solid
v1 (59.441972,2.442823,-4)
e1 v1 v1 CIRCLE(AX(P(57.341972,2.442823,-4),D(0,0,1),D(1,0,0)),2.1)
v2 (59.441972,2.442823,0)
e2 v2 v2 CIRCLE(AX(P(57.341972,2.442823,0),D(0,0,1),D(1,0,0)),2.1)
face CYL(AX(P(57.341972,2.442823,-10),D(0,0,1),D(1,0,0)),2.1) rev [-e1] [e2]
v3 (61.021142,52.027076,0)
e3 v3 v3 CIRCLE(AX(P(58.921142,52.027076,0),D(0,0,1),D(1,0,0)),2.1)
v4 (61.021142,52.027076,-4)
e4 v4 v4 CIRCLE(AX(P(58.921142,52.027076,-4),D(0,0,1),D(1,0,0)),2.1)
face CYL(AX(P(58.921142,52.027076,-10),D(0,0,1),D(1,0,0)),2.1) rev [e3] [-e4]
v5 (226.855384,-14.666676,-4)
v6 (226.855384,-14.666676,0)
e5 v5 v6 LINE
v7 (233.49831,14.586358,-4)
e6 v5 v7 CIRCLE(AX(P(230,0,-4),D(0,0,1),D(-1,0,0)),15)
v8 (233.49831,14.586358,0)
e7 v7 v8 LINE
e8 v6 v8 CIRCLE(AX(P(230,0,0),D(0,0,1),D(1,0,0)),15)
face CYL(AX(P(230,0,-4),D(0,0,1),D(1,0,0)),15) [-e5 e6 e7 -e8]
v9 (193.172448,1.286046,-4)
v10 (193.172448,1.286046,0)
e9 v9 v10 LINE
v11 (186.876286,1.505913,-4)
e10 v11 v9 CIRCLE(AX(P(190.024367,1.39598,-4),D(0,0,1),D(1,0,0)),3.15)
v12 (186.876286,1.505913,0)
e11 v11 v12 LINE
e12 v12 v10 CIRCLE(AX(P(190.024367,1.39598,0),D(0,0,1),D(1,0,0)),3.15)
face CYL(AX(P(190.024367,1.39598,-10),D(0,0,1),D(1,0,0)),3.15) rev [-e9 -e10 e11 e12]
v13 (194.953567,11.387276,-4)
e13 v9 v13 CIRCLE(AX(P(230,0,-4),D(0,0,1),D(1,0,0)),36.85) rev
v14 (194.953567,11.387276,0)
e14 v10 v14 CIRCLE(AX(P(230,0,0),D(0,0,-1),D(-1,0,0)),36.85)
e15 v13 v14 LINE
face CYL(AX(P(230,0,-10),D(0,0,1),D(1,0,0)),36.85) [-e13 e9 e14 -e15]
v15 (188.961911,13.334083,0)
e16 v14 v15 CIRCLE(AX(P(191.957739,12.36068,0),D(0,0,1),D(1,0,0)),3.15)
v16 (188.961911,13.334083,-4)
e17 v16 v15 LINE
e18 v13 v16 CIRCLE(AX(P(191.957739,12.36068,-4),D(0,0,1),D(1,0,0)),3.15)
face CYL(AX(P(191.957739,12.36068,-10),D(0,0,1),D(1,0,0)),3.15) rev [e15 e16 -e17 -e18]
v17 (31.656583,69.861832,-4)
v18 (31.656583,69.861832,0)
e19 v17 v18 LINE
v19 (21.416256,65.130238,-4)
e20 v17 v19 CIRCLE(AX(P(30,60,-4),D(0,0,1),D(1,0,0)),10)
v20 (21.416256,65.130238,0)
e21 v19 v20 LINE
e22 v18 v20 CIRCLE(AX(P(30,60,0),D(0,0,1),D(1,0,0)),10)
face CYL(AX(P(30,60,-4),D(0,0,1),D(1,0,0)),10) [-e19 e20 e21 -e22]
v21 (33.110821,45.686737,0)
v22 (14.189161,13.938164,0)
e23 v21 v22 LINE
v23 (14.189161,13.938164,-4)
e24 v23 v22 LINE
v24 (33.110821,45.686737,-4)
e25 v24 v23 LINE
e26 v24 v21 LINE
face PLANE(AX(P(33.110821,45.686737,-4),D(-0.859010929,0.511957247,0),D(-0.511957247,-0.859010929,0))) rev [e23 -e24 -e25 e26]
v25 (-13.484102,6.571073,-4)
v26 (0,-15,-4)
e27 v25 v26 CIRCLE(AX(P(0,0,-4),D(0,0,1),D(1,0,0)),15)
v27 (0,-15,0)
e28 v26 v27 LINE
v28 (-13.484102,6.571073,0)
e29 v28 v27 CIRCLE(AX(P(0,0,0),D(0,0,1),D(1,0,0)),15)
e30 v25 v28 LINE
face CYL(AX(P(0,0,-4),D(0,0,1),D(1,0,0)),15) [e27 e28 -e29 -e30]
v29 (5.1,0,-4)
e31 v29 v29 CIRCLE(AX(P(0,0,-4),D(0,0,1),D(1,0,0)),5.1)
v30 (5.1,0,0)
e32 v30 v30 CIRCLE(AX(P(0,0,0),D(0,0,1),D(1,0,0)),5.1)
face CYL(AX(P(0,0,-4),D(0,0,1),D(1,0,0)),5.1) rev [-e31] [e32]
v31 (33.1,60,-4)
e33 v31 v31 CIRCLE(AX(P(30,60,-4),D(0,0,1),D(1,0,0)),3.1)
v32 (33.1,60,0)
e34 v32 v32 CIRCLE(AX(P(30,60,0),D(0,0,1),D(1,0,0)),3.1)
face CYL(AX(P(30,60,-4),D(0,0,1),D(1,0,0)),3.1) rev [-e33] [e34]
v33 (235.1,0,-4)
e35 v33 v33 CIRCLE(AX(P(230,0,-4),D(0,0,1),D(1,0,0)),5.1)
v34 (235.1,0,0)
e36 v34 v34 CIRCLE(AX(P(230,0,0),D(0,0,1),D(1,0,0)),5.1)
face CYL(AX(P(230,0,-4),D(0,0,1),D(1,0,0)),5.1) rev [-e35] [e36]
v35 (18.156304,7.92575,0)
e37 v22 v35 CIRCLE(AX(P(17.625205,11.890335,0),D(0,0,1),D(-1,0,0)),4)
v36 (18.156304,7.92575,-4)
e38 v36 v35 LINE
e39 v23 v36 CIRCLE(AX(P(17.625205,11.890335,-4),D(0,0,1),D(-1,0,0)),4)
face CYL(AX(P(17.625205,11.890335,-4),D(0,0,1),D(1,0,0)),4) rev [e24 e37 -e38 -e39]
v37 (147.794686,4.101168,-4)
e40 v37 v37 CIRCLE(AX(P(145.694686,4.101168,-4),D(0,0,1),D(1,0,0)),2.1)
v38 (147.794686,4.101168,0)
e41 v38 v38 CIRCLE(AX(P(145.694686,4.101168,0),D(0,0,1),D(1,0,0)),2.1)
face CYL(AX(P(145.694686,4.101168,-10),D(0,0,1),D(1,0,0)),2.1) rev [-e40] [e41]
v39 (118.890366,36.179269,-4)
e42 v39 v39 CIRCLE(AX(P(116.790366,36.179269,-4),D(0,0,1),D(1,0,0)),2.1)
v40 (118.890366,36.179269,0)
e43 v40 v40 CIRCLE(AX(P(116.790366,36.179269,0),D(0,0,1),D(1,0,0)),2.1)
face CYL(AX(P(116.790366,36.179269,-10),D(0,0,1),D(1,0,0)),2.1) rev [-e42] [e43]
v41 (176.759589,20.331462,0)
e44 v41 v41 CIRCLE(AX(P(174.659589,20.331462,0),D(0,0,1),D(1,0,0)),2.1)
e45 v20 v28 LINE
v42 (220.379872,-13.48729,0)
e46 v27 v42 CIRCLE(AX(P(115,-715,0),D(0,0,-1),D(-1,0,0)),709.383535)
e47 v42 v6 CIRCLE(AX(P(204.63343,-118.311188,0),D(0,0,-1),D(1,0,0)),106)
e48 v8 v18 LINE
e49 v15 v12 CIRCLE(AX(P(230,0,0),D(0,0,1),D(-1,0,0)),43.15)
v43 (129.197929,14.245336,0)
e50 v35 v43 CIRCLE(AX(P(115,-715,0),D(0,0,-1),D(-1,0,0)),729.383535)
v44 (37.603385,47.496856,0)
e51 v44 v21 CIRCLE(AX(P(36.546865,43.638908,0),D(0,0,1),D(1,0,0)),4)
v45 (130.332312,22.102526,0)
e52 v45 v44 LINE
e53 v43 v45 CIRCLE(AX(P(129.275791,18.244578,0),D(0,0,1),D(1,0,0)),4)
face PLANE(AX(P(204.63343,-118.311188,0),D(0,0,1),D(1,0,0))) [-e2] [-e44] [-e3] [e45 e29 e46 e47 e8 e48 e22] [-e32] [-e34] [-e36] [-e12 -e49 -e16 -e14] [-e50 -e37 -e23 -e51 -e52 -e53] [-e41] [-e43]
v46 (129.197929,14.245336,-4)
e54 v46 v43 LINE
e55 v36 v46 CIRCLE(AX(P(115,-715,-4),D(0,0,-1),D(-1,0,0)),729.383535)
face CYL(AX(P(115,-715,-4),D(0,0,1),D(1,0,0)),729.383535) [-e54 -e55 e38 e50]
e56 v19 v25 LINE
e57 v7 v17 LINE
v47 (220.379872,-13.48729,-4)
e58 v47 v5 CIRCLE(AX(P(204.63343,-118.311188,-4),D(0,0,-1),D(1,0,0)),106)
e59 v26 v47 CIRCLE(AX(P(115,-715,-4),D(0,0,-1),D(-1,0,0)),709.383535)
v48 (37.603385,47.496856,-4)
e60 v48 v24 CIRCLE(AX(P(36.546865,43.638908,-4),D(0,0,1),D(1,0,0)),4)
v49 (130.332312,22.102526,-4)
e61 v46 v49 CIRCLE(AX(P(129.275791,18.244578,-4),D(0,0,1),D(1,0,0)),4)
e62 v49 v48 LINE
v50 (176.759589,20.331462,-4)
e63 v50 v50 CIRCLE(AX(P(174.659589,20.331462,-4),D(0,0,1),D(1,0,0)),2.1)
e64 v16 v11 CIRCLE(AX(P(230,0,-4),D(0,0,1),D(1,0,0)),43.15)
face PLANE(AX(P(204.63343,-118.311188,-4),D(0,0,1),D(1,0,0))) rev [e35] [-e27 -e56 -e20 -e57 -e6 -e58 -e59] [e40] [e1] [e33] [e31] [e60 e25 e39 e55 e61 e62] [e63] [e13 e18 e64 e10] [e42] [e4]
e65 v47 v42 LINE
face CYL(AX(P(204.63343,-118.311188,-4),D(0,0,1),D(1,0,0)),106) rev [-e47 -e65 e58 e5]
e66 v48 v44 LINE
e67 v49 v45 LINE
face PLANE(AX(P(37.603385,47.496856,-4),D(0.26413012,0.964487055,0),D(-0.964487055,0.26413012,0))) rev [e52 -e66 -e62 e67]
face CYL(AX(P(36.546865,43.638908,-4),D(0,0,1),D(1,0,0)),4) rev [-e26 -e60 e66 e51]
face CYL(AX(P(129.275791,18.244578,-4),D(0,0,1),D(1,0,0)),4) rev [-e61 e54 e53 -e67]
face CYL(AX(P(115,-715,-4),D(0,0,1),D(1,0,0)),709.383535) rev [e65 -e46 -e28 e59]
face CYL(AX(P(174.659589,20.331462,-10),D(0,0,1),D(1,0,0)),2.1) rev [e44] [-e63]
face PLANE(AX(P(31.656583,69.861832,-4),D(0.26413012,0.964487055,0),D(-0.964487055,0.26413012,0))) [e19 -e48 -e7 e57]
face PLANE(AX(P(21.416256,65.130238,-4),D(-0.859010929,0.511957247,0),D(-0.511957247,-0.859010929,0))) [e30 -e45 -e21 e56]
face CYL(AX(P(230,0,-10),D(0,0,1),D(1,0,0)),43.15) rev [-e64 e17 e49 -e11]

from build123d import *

# Parameters (mm, degrees)
SKETCH_1_R             = 5.1
SKETCH_1_R_2           = 3.1
SM_BASE_FLANGE_1_DEPTH = 4
SKETCH_29_R            = 2.1
CUT_EXTRUDE_7_DEPTH    = 10
CUT_EXTRUDE_11_DEPTH   = 10


# Sheet-metal steps are written as plain solids
with BuildPart() as part:
    # Sketch 1 → Базовая кромка1 (new body)
    with BuildSketch(Plane.XY):
        with BuildLine():
            Line((21.416256147, 65.130237954), (-13.484101554, 6.571073374))
            ThreePointArc((-13.484101554, 6.571073374), (-12.719396617, -7.950908734), (0, -15))
            ThreePointArc((0, -15), (110.130832642, -5.633175847), (220.379871586, -13.487289734))
            ThreePointArc((220.379871586, -13.487289734), (223.626784147, -14.026708962), (226.855383886, -14.666676157))
            ThreePointArc((226.855383886, -14.666676157), (228.418883679, -14.916436276), (230, -15))
            ThreePointArc((230, -15), (244.896230479, -1.761339697), (233.49830961, 14.586357663))
            Line((233.49830961, 14.586357663), (31.656582874, 69.861832141))
            ThreePointArc((31.656582874, 69.861832141), (25.805552993, 69.077808893), (21.416256147, 65.130237954))
        make_face()
        Circle(SKETCH_1_R, mode=Mode.SUBTRACT)
        with Locations((230, 0)):
            Circle(SKETCH_1_R, mode=Mode.SUBTRACT)
        with Locations((30, 60)):
            Circle(SKETCH_1_R_2, mode=Mode.SUBTRACT)
        with BuildLine():
            Line((37.603385022, 47.496856423), (130.332311604, 22.102526432))
            ThreePointArc((130.332311604, 22.102526432), (133.234743351, 17.673003854), (129.197928501, 14.245336107))
            ThreePointArc((129.197928501, 14.245336107), (73.556484101, 13.205174657), (18.156304087, 7.92574997))
            ThreePointArc((18.156304087, 7.92574997), (14.286499385, 9.687372505), (14.189161482, 13.938163928))
            Line((14.189161482, 13.938163928), (33.110820822, 45.686737192))
            ThreePointArc((33.110820822, 45.686737192), (35.05198474, 47.349074558), (37.603385022, 47.496856423))
        make_face(mode=Mode.SUBTRACT)
    extrude(amount=-SM_BASE_FLANGE_1_DEPTH)

    # Эскиз29 → Вырез-Вытянуть7 (cut)
    with BuildSketch(Plane.XY):
        with Locations((116.790365799, 36.179268785)):
            Circle(SKETCH_29_R)
        with Locations((174.659589105, 20.331461556)):
            Circle(SKETCH_29_R)
        with Locations((58.921142493, 52.027076013)):
            Circle(SKETCH_29_R)
        with Locations((57.341971973, 2.442823407)):
            Circle(SKETCH_29_R)
        with Locations((145.69468633, 4.101167629)):
            Circle(SKETCH_29_R)
    extrude(amount=-CUT_EXTRUDE_7_DEPTH, mode=Mode.SUBTRACT)

    # Эскиз47 → Вырез-Вытянуть11 (cut)
    with BuildSketch(Plane.XY):
        with BuildLine():
            ThreePointArc((186.876285814, 1.505913283), (189.914433505, -1.752101237), (193.172448024, 1.286046453))
            ThreePointArc((193.172448024, 1.286046453), (193.709834302, 6.398935347), (194.953567375, 11.387276243))
            ThreePointArc((194.953567375, 11.387276243), (192.93114288, 15.356507801), (188.961911322, 13.334083307))
            ThreePointArc((188.961911322, 13.334083307), (187.505545458, 7.492918866), (186.876285814, 1.505913283))
        make_face()
    extrude(amount=-CUT_EXTRUDE_11_DEPTH, mode=Mode.SUBTRACT)


solid = part.part
